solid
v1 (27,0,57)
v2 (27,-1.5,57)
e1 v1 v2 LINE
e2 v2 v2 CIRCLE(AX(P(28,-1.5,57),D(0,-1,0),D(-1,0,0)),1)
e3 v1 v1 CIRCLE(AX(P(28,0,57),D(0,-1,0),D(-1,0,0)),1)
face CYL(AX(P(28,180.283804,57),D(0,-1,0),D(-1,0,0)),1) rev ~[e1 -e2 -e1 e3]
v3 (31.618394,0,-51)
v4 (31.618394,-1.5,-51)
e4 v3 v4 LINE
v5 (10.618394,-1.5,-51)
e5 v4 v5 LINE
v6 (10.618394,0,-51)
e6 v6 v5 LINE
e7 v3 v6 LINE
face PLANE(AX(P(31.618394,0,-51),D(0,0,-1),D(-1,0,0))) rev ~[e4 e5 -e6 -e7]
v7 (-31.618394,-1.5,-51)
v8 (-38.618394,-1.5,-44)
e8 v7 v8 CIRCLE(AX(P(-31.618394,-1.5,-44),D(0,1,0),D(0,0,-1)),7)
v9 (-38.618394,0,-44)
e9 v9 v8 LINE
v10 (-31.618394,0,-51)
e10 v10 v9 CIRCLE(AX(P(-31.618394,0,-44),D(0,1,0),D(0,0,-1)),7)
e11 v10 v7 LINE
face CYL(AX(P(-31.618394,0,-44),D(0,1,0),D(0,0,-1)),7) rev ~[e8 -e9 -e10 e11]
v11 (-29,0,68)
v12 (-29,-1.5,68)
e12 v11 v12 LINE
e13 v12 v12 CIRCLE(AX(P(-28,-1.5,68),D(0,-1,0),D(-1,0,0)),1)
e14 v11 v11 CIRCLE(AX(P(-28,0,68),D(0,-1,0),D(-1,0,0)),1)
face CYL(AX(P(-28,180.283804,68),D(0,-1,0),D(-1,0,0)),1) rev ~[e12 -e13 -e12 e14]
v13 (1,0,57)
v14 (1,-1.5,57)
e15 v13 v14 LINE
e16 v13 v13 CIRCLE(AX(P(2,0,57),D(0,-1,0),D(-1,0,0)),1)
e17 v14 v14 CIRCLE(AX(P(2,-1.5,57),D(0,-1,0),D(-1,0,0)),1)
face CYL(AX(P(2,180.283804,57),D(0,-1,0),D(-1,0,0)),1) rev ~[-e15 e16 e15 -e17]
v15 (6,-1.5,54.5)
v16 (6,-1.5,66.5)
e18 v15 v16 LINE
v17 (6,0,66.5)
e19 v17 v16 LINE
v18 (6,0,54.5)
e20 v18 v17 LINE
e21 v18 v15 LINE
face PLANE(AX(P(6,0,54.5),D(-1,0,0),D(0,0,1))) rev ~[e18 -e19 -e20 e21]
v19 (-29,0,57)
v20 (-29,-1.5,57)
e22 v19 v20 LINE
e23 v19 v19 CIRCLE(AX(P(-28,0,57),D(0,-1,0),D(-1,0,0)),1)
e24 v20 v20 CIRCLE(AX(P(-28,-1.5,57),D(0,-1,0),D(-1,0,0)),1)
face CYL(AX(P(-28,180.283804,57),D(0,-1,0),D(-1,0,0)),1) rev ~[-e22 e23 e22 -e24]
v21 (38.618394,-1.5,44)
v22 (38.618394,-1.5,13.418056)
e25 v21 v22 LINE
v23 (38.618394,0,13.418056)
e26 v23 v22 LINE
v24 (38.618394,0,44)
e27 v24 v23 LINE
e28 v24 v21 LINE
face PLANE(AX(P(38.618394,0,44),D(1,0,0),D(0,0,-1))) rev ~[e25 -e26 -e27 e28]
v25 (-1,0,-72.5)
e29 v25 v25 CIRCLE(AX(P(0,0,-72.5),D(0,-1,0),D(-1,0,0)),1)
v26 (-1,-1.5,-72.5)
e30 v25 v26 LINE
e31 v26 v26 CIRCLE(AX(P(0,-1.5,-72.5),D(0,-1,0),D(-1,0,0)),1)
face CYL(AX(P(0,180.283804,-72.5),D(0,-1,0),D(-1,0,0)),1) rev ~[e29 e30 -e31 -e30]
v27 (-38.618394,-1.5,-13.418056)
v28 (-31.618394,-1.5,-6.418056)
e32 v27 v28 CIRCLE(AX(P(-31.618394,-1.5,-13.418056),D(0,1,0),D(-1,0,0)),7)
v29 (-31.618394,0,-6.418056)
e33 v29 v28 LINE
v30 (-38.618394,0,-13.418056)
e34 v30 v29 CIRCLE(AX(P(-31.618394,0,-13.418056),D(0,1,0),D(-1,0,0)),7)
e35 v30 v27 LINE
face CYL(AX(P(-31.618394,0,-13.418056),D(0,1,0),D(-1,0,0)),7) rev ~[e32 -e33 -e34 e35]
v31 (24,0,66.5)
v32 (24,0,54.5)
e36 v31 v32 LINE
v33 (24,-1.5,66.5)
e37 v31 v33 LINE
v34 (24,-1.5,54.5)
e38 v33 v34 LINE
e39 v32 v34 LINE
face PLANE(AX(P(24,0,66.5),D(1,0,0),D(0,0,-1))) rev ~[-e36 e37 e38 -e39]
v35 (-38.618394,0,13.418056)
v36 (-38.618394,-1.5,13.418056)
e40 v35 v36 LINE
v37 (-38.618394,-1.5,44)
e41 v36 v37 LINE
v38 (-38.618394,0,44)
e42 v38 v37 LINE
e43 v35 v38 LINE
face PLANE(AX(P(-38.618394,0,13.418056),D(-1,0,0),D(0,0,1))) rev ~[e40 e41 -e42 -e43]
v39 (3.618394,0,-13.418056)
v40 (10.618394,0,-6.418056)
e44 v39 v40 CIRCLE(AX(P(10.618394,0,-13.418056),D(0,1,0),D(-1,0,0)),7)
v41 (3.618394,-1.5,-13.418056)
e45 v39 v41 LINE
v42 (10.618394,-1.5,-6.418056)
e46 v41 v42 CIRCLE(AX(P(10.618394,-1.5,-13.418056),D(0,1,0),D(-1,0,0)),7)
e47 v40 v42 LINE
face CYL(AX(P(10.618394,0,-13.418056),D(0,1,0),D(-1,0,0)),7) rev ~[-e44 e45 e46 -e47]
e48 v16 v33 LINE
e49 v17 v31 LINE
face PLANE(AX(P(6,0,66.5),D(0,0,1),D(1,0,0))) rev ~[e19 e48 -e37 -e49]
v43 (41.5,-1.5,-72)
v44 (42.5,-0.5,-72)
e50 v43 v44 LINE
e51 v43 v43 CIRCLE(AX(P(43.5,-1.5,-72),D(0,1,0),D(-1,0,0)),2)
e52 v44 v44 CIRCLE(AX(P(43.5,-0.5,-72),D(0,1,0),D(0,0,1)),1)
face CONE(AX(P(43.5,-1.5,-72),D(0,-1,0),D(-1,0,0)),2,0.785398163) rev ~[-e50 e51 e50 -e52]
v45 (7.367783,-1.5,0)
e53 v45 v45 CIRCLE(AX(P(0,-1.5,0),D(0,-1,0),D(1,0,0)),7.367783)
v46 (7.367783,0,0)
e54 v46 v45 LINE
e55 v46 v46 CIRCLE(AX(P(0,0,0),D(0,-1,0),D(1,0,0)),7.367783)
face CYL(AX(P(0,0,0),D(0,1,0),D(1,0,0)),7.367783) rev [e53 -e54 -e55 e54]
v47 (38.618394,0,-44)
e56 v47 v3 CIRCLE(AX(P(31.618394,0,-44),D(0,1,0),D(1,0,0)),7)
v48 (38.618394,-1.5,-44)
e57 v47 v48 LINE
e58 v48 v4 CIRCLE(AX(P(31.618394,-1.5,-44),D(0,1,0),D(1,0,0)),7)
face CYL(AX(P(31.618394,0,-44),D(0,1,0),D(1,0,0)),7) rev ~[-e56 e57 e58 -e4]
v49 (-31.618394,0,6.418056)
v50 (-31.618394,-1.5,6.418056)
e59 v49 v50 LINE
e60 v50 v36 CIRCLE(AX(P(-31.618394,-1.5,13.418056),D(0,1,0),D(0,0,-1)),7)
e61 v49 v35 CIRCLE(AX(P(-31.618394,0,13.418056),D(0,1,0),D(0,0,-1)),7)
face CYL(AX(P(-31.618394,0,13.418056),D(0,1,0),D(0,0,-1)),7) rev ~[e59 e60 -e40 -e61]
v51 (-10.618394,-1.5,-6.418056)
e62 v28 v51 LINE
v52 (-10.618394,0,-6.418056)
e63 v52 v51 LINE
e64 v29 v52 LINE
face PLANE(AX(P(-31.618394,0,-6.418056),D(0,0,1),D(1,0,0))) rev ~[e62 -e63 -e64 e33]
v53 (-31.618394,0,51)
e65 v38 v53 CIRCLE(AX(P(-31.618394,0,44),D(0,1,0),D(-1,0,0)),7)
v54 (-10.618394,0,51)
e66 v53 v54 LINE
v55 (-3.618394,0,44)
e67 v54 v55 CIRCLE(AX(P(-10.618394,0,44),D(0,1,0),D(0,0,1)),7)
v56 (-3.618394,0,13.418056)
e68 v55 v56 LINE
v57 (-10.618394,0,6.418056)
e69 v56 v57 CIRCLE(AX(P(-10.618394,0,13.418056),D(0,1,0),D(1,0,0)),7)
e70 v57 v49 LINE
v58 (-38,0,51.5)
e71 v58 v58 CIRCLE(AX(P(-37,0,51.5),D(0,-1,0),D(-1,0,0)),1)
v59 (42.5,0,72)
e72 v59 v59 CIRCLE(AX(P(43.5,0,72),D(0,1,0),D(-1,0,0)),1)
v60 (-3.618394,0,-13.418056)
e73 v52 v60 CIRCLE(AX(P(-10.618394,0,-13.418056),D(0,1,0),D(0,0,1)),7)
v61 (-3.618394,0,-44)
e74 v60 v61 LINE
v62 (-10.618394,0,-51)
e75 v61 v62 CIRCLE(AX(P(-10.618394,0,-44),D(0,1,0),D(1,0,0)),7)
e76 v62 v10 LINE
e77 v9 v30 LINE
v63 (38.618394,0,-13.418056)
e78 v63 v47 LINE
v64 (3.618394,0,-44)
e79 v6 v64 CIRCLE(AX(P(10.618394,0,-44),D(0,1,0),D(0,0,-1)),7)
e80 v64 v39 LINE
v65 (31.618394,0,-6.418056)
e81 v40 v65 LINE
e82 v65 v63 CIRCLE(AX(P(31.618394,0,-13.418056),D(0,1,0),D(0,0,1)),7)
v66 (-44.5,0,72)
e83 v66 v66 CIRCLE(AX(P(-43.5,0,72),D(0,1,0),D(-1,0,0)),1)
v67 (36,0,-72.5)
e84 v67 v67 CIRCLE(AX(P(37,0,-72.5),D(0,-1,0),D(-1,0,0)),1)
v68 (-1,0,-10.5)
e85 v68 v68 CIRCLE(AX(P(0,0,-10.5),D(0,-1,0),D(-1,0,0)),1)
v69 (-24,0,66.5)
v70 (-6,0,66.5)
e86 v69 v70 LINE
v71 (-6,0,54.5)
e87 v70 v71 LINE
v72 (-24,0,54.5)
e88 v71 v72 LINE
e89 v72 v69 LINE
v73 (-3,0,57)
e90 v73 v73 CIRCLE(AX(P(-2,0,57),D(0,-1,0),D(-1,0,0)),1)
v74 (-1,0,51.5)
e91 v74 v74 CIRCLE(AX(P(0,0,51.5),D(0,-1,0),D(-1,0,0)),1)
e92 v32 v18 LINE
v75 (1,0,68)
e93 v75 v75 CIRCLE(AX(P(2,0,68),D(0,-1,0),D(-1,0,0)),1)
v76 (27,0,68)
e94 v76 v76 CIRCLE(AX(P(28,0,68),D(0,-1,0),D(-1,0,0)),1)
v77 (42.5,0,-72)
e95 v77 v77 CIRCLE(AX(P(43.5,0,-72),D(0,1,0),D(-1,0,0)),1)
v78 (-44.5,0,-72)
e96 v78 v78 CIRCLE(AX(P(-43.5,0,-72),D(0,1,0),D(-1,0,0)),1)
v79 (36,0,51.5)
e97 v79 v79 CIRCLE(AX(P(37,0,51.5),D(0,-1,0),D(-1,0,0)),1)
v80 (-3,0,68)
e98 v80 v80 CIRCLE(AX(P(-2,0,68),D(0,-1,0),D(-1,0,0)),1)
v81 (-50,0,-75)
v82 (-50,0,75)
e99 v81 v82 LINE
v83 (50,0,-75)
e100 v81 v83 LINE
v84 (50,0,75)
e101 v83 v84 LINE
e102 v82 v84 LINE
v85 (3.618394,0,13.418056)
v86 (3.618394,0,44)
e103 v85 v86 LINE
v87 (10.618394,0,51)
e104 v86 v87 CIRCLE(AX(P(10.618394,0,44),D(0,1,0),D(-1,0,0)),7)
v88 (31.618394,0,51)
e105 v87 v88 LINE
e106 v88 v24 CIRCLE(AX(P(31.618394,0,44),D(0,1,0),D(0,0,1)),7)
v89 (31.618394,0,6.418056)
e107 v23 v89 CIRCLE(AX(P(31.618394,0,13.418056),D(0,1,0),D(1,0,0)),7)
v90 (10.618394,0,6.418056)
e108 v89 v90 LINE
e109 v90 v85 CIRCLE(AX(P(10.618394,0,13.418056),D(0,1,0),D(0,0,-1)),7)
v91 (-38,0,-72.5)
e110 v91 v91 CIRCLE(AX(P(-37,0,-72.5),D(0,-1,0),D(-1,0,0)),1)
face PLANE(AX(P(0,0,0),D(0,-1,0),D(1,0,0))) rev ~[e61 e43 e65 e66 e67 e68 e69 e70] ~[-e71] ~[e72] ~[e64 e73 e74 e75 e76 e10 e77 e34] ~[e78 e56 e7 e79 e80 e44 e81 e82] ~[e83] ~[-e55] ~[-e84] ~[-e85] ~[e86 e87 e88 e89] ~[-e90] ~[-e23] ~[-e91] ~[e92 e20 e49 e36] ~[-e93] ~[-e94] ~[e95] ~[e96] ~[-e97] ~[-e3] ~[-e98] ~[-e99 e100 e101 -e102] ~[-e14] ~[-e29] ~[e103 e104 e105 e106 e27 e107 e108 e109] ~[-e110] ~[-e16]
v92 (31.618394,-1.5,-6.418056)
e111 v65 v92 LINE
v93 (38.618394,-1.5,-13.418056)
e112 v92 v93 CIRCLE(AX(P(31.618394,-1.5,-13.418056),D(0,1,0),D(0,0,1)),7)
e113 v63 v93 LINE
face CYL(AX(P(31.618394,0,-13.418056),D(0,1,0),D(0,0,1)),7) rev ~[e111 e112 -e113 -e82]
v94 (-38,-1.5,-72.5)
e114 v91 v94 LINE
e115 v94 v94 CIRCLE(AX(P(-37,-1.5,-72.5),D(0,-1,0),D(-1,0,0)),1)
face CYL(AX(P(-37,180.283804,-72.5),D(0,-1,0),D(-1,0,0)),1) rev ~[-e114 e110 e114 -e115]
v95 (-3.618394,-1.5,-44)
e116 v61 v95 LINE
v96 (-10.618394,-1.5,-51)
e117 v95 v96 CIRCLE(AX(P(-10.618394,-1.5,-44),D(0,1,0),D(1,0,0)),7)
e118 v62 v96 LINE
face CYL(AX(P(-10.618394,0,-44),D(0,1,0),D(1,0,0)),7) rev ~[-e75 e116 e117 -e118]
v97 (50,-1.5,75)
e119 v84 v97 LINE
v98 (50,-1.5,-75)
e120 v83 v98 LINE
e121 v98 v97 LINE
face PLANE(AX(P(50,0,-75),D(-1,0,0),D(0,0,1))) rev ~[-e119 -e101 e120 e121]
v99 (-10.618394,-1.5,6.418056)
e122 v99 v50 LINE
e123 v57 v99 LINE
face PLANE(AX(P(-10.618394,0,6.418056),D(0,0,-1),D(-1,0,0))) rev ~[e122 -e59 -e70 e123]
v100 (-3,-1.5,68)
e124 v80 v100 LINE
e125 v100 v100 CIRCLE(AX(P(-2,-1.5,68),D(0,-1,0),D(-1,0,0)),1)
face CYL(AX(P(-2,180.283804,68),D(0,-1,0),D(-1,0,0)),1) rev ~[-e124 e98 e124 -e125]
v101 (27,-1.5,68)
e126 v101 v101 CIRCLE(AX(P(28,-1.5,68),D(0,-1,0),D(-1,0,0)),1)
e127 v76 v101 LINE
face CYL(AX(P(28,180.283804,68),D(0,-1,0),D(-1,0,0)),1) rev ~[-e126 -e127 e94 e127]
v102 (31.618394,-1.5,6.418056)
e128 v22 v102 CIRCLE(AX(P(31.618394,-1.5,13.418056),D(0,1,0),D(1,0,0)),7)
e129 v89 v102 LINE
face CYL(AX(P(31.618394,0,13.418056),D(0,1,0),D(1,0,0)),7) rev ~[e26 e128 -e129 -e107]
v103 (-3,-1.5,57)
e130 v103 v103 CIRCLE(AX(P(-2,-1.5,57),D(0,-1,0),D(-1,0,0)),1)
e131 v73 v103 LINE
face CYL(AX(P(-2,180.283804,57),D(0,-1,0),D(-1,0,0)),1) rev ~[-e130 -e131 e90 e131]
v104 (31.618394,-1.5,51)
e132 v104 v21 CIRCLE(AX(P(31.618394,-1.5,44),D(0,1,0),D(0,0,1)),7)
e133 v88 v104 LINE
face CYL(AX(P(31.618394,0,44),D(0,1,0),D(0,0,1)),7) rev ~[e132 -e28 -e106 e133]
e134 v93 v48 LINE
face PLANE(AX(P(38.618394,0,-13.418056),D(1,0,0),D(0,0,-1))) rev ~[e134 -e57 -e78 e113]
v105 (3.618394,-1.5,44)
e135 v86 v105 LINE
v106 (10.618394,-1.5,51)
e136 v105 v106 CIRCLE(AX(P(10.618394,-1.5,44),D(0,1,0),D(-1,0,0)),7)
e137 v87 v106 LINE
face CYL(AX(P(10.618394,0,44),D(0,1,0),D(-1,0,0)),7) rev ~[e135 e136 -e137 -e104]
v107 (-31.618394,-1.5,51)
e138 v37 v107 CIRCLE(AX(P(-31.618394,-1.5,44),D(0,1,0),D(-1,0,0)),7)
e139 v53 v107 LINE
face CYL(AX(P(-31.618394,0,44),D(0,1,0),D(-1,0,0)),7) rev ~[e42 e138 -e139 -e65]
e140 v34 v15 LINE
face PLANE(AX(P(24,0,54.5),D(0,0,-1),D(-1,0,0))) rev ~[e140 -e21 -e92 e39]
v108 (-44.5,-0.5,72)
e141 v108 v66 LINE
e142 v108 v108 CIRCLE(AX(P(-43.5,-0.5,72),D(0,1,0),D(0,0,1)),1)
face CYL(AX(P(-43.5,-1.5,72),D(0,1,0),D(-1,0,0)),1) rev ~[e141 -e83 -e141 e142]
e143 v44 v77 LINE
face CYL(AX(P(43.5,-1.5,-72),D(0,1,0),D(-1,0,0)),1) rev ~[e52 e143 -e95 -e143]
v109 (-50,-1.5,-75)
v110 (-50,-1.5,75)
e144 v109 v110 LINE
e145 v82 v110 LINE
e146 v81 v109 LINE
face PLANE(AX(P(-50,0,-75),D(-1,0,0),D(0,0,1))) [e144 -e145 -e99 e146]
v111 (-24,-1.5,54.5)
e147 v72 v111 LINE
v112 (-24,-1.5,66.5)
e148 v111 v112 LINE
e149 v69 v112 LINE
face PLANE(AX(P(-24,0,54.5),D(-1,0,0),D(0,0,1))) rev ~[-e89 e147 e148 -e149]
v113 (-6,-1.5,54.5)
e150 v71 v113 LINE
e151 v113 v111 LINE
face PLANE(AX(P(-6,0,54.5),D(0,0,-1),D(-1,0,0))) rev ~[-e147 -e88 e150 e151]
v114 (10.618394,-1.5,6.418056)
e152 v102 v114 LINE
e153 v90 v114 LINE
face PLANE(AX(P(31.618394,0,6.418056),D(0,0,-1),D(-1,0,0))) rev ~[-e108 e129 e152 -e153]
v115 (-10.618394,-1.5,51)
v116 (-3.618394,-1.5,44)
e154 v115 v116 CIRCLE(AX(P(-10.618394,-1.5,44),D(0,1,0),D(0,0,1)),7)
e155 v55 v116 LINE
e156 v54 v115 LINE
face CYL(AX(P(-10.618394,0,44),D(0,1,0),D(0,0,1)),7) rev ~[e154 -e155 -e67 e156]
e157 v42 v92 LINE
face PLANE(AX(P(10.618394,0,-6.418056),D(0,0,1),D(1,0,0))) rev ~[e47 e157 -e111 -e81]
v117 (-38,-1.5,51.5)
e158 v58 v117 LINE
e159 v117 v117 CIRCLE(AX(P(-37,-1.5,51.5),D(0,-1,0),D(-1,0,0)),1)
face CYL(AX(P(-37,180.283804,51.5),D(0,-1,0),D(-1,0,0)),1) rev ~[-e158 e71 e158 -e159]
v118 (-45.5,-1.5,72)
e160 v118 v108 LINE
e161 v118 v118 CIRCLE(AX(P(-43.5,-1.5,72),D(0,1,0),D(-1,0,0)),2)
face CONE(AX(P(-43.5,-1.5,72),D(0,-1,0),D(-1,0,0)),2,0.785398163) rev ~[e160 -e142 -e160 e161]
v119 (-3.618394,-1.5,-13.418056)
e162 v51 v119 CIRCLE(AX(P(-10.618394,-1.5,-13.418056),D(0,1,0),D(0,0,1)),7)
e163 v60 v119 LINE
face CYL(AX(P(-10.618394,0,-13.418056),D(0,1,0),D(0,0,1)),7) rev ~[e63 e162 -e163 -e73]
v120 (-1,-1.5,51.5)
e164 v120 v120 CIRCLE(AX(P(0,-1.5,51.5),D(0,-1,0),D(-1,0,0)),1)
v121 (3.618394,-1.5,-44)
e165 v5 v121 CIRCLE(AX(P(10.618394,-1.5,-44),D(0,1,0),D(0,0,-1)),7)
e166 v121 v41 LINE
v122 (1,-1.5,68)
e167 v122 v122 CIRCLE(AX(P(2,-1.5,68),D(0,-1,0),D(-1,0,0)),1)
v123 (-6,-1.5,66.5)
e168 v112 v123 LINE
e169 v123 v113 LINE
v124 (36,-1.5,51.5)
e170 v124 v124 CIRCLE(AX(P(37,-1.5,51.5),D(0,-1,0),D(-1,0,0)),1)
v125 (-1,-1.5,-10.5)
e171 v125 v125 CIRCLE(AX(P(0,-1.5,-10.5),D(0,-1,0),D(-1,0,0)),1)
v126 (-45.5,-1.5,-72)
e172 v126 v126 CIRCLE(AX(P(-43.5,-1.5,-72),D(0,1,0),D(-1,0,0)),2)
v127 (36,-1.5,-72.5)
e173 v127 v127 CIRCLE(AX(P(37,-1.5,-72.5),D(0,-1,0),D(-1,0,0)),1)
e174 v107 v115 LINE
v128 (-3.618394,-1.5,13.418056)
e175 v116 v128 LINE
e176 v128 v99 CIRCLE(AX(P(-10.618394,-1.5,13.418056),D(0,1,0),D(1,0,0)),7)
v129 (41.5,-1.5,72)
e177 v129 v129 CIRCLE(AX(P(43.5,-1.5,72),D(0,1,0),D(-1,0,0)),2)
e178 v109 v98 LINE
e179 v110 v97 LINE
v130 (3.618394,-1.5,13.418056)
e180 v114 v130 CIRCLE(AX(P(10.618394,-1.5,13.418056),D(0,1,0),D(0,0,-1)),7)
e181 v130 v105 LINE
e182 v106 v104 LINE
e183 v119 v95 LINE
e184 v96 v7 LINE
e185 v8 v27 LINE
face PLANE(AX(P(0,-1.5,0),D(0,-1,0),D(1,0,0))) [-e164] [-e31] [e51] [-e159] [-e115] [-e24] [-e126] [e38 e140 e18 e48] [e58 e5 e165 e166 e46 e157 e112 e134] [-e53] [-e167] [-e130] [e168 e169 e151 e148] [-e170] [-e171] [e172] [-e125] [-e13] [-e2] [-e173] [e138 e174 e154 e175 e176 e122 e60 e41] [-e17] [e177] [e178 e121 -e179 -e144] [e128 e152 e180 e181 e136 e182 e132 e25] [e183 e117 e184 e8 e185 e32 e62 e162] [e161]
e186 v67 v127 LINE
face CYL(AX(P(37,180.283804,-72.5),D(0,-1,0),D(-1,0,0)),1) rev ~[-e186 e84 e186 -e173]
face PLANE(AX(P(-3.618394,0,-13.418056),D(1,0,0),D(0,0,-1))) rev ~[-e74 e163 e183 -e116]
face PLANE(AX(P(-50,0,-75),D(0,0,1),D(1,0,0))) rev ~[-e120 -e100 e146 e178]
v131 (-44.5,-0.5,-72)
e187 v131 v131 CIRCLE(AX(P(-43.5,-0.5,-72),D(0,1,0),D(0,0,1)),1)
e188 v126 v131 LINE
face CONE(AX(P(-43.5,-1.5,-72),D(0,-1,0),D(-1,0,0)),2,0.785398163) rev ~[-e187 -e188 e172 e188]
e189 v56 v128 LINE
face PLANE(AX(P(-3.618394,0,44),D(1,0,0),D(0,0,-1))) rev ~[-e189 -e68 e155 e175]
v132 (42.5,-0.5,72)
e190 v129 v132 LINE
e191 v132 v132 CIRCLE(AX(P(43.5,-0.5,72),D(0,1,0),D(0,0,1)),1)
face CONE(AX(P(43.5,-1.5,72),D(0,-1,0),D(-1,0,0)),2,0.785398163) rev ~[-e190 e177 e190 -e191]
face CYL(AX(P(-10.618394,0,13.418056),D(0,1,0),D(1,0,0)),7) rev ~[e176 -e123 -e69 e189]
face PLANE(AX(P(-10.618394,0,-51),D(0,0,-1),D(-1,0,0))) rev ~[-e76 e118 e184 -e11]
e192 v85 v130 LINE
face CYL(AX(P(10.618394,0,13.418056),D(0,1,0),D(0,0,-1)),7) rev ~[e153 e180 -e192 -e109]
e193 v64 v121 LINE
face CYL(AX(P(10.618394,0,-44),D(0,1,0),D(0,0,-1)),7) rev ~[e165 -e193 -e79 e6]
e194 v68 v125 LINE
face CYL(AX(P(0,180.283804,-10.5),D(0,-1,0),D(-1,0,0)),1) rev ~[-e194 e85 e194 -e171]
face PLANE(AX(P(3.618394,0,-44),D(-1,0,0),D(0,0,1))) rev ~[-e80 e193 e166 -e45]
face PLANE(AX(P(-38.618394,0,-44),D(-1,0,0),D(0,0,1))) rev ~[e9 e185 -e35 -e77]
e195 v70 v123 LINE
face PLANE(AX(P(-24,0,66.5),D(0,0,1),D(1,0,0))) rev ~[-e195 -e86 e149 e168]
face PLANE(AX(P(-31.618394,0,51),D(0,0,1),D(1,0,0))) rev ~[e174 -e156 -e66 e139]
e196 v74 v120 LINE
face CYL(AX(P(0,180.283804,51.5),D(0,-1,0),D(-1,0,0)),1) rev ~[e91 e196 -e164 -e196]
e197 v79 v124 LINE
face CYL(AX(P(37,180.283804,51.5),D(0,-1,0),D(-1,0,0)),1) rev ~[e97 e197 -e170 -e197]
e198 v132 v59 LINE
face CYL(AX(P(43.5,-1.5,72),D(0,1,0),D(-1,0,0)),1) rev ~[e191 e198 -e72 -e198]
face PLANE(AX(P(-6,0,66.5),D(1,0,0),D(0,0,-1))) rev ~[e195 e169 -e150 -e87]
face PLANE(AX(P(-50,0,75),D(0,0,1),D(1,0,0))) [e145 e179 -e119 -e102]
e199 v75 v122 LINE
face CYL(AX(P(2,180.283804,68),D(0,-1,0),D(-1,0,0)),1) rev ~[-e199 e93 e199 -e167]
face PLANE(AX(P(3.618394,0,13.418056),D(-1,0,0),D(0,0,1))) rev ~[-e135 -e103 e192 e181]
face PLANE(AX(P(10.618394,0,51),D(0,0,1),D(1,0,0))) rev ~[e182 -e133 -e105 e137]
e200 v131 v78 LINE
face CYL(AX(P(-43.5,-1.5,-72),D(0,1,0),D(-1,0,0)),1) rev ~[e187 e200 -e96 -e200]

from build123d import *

# Parameters (mm, degrees)
F0_W           = 100
F0_H           = 150
F0_R           = 7.3677826157
F1_DEPTH       = 1.5
F3_D           = 2
F3_CSINK_D     = 4
F3_CSINK_ANGLE = 90
F4_D           = 2
F6_D           = 2


# Not quite as in the source:
# - a feature names something its author has since deleted; it is built from what else it names


with BuildPart() as f1:
    # F0 (on Front) → F1 (new body)
    with BuildSketch(Plane.XZ):
        Rectangle(F0_W, F0_H)
        with BuildLine():
            Line((-31.6183936375, -6.4180564158), (-10.6183936375, -6.4180564158))
            ThreePointArc((-10.6183936375, -6.4180564158), (-5.6686461691, -8.4683089475), (-3.6183936375, -13.4180564158))
            Line((-3.6183936375, -13.4180564158), (-3.6183936375, -44))
            ThreePointArc((-3.6183936375, -44), (-5.6686461691, -48.9497474683), (-10.6183936375, -51))
            Line((-10.6183936375, -51), (-31.6183936375, -51))
            ThreePointArc((-31.6183936375, -51), (-36.5681411058, -48.9497474683), (-38.6183936375, -44))
            Line((-38.6183936375, -44), (-38.6183936375, -13.4180564158))
            ThreePointArc((-38.6183936375, -13.4180564158), (-36.5681411058, -8.4683089475), (-31.6183936375, -6.4180564158))
        make_face(mode=Mode.SUBTRACT)
        with BuildLine():
            ThreePointArc((38.6183936375, -44), (36.5681411058, -48.9497474683), (31.6183936375, -51))
            Line((31.6183936375, -51), (10.6183936375, -51))
            ThreePointArc((10.6183936375, -51), (5.6686461691, -48.9497474683), (3.6183936375, -44))
            Line((3.6183936375, -44), (3.6183936375, -13.4180564158))
            ThreePointArc((3.6183936375, -13.4180564158), (5.6686461691, -8.4683089475), (10.6183936375, -6.4180564158))
            Line((10.6183936375, -6.4180564158), (31.6183936375, -6.4180564158))
            ThreePointArc((31.6183936375, -6.4180564158), (36.5681411058, -8.4683089475), (38.6183936375, -13.4180564158))
            Line((38.6183936375, -13.4180564158), (38.6183936375, -44))
        make_face(mode=Mode.SUBTRACT)
        with BuildLine():
            ThreePointArc((-3.6183936375, 13.4180564158), (-5.6686461691, 8.4683089475), (-10.6183936375, 6.4180564158))
            Line((-10.6183936375, 6.4180564158), (-31.6183936375, 6.4180564158))
            ThreePointArc((-31.6183936375, 6.4180564158), (-36.5681411058, 8.4683089475), (-38.6183936375, 13.4180564158))
            Line((-38.6183936375, 13.4180564158), (-38.6183936375, 44))
            ThreePointArc((-38.6183936375, 44), (-36.5681411058, 48.9497474683), (-31.6183936375, 51))
            Line((-31.6183936375, 51), (-10.6183936375, 51))
            ThreePointArc((-10.6183936375, 51), (-5.6686461691, 48.9497474683), (-3.6183936375, 44))
            Line((-3.6183936375, 44), (-3.6183936375, 13.4180564158))
        make_face(mode=Mode.SUBTRACT)
        Polygon((-24, 54.5), (-24, 66.5), (-15, 66.5), (-6, 66.5), (-6, 54.5), (-15, 54.5), align=None, mode=Mode.SUBTRACT)
        Circle(F0_R, mode=Mode.SUBTRACT)
        with BuildLine():
            ThreePointArc((10.6183936375, 6.4180564158), (5.6686461691, 8.4683089475), (3.6183936375, 13.4180564158))
            Line((3.6183936375, 13.4180564158), (3.6183936375, 44))
            ThreePointArc((3.6183936375, 44), (5.6686461691, 48.9497474683), (10.6183936375, 51))
            Line((10.6183936375, 51), (31.6183936375, 51))
            ThreePointArc((31.6183936375, 51), (36.5681411058, 48.9497474683), (38.6183936375, 44))
            Line((38.6183936375, 44), (38.6183936375, 13.4180564158))
            ThreePointArc((38.6183936375, 13.4180564158), (36.5681411058, 8.4683089475), (31.6183936375, 6.4180564158))
            Line((31.6183936375, 6.4180564158), (10.6183936375, 6.4180564158))
        make_face(mode=Mode.SUBTRACT)
        Polygon((6, 54.5), (6, 66.5), (15, 66.5), (24, 66.5), (24, 54.5), (15, 54.5), align=None, mode=Mode.SUBTRACT)
    extrude(amount=F1_DEPTH)

    # F3 (through all)
    with Locations(Plane.XZ.offset(1.5)):
        with Locations((-43.5, -72), (43.5, -72), (43.5, 72), (-43.5, 72)):
            CounterSinkHole(F3_D / 2, F3_CSINK_D / 2, counter_sink_angle=F3_CSINK_ANGLE)

    # F4 (through all)
    with Locations(Plane(origin=(0, 0, 0), x_dir=(1, 0, 0), z_dir=(0, 1, 0))):
        with Locations((-28, -68), (-28, -57), (-2, -57), (-2, -68), (2, -68), (2, -57), (28, -57), (28, -68)):
            Hole(F4_D / 2)

    # F6 (through all)
    with Locations(Plane(origin=(0, 0, 0), x_dir=(1, 0, 0), z_dir=(0, 1, 0))):
        with Locations((-37, 72.5), (0, 72.5), (37, 72.5), (0, 10.5), (0, -51.5), (37, -51.5), (-37, -51.5)):
            Hole(F6_D / 2)


solid = f1.part
